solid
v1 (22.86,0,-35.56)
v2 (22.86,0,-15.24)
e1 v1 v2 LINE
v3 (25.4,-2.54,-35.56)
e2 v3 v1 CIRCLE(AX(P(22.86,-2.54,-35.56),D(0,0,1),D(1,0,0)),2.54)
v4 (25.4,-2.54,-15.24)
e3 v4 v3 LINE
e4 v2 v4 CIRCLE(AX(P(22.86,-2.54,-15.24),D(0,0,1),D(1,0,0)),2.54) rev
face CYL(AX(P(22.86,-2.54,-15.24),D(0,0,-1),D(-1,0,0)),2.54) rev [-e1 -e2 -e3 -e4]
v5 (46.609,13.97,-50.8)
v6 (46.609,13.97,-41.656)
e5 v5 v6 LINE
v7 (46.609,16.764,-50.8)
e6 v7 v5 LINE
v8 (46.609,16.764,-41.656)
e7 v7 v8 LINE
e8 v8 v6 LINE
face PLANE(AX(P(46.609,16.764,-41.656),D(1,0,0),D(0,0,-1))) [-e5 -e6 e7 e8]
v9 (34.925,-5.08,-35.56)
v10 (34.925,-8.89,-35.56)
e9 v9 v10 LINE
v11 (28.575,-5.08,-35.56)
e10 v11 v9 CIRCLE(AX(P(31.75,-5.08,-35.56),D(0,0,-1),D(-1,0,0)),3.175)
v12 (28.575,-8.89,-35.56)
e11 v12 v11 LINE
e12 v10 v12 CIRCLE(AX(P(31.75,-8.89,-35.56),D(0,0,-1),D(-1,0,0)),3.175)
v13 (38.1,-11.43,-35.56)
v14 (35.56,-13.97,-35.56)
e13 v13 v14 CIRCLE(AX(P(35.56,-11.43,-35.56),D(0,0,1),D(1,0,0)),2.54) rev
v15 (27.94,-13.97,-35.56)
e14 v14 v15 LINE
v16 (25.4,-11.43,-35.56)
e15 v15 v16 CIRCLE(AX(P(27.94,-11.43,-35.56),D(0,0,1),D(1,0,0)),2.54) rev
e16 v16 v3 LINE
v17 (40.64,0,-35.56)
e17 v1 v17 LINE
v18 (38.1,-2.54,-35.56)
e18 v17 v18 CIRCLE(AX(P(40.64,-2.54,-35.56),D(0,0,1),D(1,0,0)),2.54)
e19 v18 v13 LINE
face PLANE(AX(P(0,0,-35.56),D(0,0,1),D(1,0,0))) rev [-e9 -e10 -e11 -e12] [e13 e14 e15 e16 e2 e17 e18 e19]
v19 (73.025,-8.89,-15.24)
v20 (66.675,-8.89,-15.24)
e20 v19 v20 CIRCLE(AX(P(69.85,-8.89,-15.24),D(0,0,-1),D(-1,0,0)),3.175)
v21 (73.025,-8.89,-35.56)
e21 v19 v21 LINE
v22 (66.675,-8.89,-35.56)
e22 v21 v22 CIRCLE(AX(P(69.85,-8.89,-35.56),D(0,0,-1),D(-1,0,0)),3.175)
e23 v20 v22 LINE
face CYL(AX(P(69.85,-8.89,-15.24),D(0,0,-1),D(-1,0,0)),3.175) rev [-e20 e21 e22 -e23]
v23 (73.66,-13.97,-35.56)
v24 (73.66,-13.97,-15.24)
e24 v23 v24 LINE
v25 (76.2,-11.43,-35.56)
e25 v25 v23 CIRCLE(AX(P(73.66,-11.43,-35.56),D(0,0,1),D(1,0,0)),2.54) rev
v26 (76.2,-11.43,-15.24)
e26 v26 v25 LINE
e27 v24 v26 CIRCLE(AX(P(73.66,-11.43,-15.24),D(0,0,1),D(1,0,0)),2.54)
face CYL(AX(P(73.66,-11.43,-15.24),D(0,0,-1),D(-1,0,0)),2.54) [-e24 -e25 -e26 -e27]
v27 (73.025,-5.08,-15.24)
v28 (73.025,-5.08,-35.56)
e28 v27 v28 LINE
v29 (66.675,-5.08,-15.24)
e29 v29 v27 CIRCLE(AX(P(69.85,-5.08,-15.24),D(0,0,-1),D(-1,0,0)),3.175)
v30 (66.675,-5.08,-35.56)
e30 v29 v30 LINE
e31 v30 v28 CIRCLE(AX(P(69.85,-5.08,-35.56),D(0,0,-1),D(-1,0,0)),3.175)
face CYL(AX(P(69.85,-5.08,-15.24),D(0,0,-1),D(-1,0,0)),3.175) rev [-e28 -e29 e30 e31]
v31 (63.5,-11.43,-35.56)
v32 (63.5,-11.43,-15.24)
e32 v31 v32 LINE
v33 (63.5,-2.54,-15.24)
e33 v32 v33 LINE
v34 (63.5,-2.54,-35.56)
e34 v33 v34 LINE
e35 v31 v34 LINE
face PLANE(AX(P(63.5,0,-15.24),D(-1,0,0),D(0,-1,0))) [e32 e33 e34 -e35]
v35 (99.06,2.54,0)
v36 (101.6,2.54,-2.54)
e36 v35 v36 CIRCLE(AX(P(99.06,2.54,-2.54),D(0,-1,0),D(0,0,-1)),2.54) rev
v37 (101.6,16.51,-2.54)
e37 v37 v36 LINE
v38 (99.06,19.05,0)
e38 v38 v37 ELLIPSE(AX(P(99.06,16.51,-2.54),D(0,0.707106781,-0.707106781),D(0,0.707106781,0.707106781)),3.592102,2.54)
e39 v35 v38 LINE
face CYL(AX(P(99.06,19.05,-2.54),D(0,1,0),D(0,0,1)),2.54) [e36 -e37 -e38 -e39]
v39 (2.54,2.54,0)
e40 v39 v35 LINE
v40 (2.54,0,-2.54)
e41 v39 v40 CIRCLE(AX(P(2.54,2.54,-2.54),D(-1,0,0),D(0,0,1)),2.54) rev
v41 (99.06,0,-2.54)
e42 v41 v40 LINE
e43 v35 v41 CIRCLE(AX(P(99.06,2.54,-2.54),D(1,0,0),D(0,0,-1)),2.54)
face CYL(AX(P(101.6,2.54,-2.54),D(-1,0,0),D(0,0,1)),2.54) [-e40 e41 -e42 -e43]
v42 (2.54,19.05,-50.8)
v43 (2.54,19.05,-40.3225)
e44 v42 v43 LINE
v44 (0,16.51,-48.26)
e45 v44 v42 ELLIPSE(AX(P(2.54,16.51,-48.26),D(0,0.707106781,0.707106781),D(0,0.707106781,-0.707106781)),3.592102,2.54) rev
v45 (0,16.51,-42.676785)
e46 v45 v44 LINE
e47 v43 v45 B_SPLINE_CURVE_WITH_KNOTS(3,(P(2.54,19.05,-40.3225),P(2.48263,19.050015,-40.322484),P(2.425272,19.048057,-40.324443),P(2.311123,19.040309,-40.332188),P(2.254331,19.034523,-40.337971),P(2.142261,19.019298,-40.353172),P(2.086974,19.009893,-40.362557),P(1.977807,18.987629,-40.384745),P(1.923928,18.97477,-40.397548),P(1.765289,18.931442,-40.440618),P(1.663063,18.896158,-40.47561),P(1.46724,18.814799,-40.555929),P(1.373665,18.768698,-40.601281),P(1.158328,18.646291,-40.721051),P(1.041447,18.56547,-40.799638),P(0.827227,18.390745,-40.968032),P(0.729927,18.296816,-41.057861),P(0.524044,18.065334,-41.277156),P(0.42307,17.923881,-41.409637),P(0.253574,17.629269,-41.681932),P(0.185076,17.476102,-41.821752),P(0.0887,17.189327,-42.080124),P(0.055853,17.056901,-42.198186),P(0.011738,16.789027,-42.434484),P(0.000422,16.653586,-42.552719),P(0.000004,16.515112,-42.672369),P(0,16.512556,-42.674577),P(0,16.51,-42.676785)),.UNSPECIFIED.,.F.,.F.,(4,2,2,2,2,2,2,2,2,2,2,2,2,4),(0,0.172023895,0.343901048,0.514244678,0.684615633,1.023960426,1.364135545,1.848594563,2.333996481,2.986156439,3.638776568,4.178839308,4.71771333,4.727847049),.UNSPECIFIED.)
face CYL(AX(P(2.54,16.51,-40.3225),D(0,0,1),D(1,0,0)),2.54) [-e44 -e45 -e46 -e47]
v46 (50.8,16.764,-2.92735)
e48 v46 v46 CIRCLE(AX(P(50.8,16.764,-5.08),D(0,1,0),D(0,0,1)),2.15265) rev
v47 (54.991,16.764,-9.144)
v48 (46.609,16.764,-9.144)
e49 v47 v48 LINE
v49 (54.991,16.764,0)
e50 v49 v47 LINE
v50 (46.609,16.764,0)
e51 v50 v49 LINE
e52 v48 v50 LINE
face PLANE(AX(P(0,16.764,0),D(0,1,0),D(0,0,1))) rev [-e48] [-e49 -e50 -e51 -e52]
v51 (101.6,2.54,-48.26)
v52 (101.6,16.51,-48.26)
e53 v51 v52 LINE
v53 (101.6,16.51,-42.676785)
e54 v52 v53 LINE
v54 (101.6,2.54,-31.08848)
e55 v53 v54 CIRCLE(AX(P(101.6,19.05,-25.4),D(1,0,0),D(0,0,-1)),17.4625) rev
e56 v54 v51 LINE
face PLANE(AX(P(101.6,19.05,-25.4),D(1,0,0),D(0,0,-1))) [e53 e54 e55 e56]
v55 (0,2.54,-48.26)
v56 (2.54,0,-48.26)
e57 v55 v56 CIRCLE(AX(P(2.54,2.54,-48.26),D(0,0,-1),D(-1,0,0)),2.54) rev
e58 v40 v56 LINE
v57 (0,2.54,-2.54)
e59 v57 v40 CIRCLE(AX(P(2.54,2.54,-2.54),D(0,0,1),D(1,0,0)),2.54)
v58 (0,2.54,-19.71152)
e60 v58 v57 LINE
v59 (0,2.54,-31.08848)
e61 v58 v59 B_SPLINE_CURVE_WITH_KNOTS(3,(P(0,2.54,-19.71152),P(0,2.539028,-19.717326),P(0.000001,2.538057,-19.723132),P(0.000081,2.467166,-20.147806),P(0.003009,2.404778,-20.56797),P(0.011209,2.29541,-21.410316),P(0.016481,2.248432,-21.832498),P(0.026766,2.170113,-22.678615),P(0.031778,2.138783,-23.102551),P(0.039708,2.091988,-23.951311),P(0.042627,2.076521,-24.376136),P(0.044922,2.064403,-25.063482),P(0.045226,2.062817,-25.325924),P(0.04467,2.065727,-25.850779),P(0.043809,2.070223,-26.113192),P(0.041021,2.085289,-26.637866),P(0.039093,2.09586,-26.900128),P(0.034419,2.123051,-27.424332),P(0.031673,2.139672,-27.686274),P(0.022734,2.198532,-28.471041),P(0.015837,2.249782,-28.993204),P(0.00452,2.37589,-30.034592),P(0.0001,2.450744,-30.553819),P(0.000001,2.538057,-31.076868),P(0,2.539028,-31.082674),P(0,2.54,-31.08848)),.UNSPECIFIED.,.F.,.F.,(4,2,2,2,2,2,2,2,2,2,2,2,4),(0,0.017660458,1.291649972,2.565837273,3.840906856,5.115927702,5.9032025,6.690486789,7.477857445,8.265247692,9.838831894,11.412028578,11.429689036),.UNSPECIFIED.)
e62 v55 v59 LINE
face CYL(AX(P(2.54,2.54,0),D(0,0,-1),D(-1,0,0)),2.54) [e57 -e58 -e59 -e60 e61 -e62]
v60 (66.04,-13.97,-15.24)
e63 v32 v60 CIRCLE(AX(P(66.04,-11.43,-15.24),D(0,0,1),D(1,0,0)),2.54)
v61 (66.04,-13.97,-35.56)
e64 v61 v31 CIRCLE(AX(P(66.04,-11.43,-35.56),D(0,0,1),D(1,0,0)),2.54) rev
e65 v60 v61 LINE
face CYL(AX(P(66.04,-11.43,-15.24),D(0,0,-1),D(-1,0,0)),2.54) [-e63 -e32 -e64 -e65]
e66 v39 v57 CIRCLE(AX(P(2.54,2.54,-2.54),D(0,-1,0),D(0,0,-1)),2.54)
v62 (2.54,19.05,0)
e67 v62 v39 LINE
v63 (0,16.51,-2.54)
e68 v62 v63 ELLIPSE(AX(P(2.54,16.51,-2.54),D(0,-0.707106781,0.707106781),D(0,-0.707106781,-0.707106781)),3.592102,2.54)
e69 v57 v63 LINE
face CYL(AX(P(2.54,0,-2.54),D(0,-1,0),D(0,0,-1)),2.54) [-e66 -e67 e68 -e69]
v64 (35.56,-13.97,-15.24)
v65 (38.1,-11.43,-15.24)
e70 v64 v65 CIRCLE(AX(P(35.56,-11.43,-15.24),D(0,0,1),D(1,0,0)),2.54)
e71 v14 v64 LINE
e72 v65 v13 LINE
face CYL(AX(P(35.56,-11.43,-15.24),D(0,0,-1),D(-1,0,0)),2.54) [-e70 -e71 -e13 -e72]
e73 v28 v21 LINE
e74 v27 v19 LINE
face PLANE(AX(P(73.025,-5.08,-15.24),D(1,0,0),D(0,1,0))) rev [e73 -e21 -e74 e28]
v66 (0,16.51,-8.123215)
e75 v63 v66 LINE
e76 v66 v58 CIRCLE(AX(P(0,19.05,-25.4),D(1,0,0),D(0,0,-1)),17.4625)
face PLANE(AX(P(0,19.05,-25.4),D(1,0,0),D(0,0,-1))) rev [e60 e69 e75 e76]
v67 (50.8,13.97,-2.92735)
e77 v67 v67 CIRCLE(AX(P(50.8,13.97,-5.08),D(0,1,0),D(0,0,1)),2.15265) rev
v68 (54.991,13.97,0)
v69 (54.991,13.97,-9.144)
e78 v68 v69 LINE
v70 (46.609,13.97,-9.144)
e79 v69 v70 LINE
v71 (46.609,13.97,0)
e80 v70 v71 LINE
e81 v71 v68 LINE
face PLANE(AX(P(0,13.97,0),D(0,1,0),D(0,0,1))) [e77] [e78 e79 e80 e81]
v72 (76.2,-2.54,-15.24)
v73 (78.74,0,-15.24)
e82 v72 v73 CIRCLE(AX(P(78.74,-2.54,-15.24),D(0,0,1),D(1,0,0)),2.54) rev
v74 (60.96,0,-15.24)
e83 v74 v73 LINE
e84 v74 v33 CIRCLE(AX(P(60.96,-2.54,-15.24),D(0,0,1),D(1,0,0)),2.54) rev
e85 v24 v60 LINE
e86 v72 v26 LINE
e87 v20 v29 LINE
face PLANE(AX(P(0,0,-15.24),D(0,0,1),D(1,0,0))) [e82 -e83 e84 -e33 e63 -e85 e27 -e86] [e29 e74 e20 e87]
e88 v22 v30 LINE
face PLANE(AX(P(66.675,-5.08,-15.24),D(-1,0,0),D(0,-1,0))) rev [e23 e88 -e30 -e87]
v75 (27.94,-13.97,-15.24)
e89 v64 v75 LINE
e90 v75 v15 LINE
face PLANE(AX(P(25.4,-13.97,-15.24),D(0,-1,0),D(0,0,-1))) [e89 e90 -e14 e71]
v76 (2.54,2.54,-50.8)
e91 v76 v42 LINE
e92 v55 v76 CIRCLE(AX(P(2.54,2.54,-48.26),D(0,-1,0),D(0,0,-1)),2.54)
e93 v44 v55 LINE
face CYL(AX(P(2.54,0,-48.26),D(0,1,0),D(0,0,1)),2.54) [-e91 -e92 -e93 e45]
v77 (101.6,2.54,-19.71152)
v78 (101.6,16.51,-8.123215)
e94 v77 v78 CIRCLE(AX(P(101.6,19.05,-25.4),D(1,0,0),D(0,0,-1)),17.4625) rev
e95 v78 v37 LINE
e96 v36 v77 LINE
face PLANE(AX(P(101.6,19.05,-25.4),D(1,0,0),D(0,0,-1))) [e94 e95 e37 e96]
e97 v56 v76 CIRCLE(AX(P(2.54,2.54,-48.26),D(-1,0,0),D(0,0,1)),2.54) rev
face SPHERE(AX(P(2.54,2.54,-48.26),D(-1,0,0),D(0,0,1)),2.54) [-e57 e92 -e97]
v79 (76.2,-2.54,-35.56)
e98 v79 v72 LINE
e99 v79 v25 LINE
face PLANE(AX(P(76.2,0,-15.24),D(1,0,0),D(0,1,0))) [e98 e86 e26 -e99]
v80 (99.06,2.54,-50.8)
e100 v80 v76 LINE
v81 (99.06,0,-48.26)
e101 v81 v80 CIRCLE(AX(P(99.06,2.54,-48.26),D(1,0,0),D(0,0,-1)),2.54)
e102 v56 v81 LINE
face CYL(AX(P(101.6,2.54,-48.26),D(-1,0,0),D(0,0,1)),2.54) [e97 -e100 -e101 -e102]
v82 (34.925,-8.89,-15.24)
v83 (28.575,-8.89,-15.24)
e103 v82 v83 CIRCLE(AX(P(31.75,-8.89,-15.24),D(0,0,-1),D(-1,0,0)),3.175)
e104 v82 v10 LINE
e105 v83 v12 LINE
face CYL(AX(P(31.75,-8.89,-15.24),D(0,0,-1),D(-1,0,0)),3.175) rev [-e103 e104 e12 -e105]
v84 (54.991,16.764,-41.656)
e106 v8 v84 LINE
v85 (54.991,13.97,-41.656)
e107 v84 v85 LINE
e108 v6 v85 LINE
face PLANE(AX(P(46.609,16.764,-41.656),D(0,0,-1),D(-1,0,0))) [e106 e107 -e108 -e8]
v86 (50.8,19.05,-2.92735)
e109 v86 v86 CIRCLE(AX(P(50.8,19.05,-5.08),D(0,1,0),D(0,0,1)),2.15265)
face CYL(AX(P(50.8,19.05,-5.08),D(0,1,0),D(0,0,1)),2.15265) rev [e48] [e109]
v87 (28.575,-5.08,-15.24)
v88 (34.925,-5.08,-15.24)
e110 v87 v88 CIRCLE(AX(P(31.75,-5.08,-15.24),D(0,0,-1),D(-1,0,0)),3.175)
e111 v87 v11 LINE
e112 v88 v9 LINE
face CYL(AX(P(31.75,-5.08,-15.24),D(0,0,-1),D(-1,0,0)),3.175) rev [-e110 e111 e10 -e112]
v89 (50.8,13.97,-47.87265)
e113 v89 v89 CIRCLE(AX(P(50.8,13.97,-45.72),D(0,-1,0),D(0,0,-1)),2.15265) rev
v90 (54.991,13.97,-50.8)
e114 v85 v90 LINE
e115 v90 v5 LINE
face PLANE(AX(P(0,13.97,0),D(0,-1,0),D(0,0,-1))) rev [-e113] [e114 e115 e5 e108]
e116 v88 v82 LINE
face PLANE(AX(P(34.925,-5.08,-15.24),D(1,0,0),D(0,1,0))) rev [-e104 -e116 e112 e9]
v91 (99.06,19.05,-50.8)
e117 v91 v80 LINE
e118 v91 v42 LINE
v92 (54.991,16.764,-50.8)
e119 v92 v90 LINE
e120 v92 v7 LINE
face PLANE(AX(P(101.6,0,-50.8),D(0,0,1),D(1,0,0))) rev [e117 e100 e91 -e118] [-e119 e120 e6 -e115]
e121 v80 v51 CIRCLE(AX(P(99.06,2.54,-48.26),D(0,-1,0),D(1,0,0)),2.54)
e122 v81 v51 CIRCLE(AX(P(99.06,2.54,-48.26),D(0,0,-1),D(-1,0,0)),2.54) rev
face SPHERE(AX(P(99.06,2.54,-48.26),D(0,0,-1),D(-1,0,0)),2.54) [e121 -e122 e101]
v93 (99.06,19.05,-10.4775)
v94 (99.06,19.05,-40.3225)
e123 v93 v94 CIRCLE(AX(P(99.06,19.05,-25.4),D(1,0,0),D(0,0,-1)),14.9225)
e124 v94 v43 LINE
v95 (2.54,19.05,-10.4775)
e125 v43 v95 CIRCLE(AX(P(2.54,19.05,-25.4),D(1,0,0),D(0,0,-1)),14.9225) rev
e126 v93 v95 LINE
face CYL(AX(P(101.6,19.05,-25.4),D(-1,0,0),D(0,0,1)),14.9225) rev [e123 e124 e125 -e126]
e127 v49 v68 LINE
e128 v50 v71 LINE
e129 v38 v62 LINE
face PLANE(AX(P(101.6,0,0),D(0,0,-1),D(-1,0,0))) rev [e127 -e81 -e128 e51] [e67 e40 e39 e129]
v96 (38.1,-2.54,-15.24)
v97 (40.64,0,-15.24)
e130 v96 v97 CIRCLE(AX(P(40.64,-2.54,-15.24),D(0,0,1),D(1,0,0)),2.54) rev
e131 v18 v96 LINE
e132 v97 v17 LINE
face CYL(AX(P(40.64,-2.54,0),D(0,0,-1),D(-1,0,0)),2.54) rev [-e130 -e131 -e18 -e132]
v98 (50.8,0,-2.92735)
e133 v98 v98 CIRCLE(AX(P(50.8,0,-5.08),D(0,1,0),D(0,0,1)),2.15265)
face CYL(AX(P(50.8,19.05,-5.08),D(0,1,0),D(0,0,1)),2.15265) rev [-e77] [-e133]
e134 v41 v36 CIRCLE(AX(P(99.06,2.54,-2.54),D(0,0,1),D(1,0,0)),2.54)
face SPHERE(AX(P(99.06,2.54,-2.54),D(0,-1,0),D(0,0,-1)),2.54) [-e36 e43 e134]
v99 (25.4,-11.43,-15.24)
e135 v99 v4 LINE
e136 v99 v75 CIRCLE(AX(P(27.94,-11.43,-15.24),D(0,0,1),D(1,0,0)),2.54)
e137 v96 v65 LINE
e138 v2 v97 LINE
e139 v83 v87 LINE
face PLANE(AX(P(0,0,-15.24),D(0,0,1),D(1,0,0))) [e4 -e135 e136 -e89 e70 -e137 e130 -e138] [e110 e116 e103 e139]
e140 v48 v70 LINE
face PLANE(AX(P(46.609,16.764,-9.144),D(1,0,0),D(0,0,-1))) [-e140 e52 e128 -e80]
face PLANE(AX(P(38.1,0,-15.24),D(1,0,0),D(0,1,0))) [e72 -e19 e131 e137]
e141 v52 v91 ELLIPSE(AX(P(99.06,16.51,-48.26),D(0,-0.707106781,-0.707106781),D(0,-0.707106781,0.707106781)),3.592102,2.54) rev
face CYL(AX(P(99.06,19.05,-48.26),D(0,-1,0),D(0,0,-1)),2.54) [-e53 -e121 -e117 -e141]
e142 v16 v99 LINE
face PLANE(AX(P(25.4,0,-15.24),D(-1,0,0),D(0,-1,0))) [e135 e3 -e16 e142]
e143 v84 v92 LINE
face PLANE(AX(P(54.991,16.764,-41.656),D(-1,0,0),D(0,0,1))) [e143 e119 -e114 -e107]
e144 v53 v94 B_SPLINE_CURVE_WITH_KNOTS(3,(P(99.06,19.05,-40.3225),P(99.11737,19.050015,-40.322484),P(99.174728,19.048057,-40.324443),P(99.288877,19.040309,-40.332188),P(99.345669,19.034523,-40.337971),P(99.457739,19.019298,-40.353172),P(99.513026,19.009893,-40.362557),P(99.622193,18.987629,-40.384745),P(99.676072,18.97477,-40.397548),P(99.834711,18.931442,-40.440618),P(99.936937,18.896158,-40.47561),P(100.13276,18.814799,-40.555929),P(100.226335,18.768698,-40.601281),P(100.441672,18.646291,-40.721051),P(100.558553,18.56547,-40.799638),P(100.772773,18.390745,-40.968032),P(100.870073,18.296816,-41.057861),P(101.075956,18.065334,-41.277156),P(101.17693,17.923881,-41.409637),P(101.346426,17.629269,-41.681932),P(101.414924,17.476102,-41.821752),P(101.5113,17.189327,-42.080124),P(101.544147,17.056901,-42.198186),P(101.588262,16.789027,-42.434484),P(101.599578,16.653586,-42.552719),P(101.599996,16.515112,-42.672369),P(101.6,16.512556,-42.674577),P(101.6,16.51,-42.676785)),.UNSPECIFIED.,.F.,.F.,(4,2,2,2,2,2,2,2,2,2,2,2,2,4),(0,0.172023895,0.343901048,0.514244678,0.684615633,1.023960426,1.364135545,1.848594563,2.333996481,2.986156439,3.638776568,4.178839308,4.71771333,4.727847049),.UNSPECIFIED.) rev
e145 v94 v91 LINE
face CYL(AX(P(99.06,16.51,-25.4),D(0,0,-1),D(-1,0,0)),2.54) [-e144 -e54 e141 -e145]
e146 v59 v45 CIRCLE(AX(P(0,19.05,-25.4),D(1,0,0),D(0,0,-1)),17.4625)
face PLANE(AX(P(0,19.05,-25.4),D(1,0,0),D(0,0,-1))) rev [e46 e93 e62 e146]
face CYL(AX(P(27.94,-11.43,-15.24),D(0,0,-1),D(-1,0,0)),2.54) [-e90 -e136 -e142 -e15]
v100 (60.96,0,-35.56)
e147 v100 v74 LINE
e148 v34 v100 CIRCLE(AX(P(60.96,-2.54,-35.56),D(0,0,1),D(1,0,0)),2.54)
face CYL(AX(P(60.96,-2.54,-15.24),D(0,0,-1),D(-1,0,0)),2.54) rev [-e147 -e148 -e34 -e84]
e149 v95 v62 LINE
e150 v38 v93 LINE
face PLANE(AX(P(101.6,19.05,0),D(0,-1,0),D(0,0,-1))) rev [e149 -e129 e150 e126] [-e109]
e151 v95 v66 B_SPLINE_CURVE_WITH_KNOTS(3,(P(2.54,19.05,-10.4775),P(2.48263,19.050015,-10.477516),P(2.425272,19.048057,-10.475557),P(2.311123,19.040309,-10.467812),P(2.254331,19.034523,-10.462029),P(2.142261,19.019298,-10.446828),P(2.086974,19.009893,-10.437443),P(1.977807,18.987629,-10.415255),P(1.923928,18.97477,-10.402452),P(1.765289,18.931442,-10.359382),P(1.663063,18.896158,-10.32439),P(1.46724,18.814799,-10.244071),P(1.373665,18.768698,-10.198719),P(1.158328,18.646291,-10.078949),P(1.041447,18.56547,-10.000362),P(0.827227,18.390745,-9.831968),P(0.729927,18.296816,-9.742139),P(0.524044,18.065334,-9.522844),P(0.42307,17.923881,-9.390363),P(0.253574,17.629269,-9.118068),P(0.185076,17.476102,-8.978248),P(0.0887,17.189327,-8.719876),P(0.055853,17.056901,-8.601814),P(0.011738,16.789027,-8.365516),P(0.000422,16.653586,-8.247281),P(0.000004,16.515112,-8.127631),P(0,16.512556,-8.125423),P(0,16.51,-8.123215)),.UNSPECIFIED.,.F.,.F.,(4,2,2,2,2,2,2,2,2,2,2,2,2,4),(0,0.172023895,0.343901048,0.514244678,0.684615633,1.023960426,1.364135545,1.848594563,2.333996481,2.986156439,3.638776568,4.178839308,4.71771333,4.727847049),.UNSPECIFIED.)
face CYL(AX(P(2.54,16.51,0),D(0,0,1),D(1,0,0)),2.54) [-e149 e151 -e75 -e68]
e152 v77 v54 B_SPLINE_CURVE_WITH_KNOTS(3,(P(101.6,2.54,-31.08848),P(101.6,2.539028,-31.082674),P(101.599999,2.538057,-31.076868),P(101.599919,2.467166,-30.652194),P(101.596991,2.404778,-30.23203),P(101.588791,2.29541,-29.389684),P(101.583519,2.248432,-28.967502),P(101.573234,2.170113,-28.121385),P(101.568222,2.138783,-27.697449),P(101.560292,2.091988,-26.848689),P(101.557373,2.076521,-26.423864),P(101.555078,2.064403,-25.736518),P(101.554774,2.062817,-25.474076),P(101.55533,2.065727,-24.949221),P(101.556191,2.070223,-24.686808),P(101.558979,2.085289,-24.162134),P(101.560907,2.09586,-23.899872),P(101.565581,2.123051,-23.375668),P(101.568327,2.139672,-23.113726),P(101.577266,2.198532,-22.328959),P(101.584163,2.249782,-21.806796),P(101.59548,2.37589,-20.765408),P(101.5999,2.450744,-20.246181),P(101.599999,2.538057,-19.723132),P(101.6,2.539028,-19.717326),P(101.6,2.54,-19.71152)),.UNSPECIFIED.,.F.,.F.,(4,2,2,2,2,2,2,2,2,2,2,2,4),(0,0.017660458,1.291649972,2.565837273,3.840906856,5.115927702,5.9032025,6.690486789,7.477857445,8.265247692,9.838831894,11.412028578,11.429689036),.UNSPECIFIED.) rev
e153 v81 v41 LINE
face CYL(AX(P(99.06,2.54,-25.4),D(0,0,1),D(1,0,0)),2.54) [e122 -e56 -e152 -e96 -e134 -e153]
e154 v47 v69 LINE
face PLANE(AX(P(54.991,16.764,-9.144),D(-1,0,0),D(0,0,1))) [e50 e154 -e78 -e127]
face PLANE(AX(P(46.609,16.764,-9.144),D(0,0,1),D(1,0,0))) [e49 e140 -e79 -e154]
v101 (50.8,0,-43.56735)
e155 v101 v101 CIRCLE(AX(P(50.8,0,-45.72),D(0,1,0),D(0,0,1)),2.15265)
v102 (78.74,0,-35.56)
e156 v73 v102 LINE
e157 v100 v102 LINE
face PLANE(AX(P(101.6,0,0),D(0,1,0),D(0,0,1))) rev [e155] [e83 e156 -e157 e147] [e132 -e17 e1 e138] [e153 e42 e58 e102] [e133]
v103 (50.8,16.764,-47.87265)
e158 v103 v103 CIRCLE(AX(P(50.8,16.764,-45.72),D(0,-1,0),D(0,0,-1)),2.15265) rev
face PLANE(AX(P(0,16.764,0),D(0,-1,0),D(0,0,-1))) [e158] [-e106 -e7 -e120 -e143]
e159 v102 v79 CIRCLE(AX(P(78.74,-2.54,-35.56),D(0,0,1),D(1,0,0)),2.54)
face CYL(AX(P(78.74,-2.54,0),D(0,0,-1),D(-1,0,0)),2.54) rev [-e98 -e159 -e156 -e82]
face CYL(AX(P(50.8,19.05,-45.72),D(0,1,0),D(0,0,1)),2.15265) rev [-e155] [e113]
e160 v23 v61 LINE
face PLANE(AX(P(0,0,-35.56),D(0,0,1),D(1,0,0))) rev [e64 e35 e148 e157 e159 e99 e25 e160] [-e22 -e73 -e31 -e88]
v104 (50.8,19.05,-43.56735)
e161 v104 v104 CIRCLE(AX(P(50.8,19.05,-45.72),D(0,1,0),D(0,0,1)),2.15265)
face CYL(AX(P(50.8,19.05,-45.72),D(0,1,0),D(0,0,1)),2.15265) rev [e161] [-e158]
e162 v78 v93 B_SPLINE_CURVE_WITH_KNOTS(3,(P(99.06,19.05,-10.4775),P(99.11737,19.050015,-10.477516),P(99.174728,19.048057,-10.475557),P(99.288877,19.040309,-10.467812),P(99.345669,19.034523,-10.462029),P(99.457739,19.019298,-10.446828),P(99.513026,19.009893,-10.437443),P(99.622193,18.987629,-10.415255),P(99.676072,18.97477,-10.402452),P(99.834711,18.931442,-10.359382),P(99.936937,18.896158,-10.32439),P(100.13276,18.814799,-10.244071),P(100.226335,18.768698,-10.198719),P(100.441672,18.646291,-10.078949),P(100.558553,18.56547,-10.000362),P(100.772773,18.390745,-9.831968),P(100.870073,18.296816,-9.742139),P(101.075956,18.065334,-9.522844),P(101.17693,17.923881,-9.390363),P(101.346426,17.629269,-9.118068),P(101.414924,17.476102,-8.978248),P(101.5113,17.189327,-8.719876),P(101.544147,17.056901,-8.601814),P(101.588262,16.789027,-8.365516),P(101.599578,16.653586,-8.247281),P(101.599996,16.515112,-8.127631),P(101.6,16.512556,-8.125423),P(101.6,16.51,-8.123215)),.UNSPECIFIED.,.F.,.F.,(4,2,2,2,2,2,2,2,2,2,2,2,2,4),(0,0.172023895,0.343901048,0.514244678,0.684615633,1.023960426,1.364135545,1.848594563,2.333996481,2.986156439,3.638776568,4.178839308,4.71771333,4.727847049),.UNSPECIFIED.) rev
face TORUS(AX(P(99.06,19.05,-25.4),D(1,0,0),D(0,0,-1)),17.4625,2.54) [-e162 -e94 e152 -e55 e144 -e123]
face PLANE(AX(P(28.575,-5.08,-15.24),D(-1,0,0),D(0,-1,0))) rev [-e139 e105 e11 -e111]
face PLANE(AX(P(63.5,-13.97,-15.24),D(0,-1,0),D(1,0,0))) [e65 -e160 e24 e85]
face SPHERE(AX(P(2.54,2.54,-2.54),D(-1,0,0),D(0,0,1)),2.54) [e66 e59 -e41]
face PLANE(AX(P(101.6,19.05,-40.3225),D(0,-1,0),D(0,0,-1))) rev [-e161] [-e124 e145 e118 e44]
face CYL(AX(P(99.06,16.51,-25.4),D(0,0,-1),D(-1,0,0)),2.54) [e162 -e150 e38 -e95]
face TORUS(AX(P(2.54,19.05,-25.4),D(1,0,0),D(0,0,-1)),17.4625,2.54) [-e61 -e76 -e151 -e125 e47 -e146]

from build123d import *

# Parameters (mm, degrees)
BOSS_EXTRUDE2_DEPTH   = 101.6
SKETCH14_W            = 12.7
SKETCH14_H            = 13.97
BOSS_EXTRUDE3_DEPTH   = 20.32
F_6_CLEARANCE_HOLE1_D = 4.3053
SKETCH8_W             = 8.382
SKETCH8_H             = 9.144
CUT_EXTRUDE2_DEPTH    = 2.794
FILLET1_R             = 2.54


with BuildPart() as part:
    # Sketch3 → Boss-Extrude2 (new body)
    with BuildSketch(Plane(origin=(0, 0, 0), x_dir=(0, 0, -1), z_dir=(1, 0, 0))):
        with BuildLine():
            Line((40.3225, 19.05), (50.8, 19.05))
            Line((50.8, 19.05), (50.8, 0))
            Line((50.8, 0), (0, 0))
            Line((0, 0), (0, 19.05))
            Line((0, 19.05), (10.4775, 19.05))
            ThreePointArc((10.4775, 19.05), (25.4, 4.1275), (40.3225, 19.05))
        make_face()
    extrude(amount=BOSS_EXTRUDE2_DEPTH)

    # Sketch14 → Boss-Extrude3 (add)
    # profile 1 of 2: a face of its own
    with BuildSketch(Plane(origin=(0, 0, -35.56), x_dir=(-1, 0, 0), z_dir=(0, 0, -1))):
        with Locations((-69.85, -6.985)):
            Rectangle(SKETCH14_W, SKETCH14_H)
        with BuildLine():
            Line((-66.675, -5.08), (-66.675, -8.89))
            ThreePointArc((-66.675, -8.89), (-69.85, -12.065), (-73.025, -8.89))
            Line((-73.025, -8.89), (-73.025, -5.08))
            ThreePointArc((-73.025, -5.08), (-69.85, -1.905), (-66.675, -5.08))
        make_face(mode=Mode.SUBTRACT)
    # profile 2 of 2: a face of its own
    with BuildSketch(Plane(origin=(0, 0, -35.56), x_dir=(-1, 0, 0), z_dir=(0, 0, -1))):
        with Locations((-31.75, -6.985)):
            Rectangle(SKETCH14_W, SKETCH14_H)
        with BuildLine():
            Line((-28.575, -5.08), (-28.575, -8.89))
            ThreePointArc((-28.575, -8.89), (-31.75, -12.065), (-34.925, -8.89))
            Line((-34.925, -8.89), (-34.925, -5.08))
            ThreePointArc((-34.925, -5.08), (-31.75, -1.905), (-28.575, -5.08))
        make_face(mode=Mode.SUBTRACT)
    extrude(amount=-BOSS_EXTRUDE3_DEPTH)

    # #6 Clearance Hole1 (through all)
    with Locations(Plane(origin=(0, 19.05, 0), x_dir=(1, 0, 0), z_dir=(0, 1, 0))):
        with Locations((50.8, 5.08), (50.8, 45.72)):
            Hole(F_6_CLEARANCE_HOLE1_D / 2)

    # Sketch8 → Cut-Extrude2 (cut)
    with BuildSketch(Plane(origin=(0, 13.97, 0), x_dir=(1, 0, 0), z_dir=(0, 1, 0))):
        with Locations((50.8, 4.572)):
            Rectangle(SKETCH8_W, SKETCH8_H)
        with Locations((50.8, 46.228)):
            Rectangle(SKETCH8_W, SKETCH8_H)
    extrude(amount=CUT_EXTRUDE2_DEPTH, mode=Mode.SUBTRACT)

    # Fillet1
    # the kernel refuses this fillet: 2.54 mm, written as the material it adds along each edge
    with BuildSketch(Plane(origin=(63.5, 0, -35.56), x_dir=(-1, 0, 0), z_dir=(0, 0, 1)), Plane(origin=(25.4, 0, -35.56), x_dir=(-1, 0, 0), z_dir=(0, 0, 1))) as fillet1_piece_1:
        with BuildLine():
            CenterArc((FILLET1_R, FILLET1_R), FILLET1_R, 180, 90)
            Line((0, FILLET1_R), (0, 0))
            Line((0, 0), (FILLET1_R, 0))
        make_face()
    extrude(amount=20.32)
    with BuildSketch(Plane(origin=(76.2, 0, -35.56), x_dir=(1, 0, 0), z_dir=(0, 0, 1)), Plane(origin=(38.1, 0, -35.56), x_dir=(1, 0, 0), z_dir=(0, 0, 1))) as fillet1_piece_2:
        with BuildLine():
            CenterArc((FILLET1_R, -FILLET1_R), FILLET1_R, 90, 90)
            Line((0, -FILLET1_R), (0, 0))
            Line((0, 0), (FILLET1_R, 0))
        make_face()
    extrude(amount=20.32)
    # the kernel refuses this fillet: 2.54 mm, written as the material it takes off along each edge
    with BuildSketch(Plane(origin=(2.54, 2.54, -48.26), x_dir=(-1, 0, 0), z_dir=(0, 0, -1))) as fillet1_2_piece_1_section:
        Polygon((0, 0), (FILLET1_R, 0), (FILLET1_R, -FILLET1_R), (0, -FILLET1_R), align=None)
    fillet1_2_piece_1 = extrude(amount=FILLET1_R, mode=Mode.PRIVATE)
    fillet1_2_piece_1 = fillet1_2_piece_1 - Plane(origin=(2.54, 2.54, -48.26), x_dir=(0.7071067811865475, 0.7071067811865475, 0), z_dir=(0, 0, -1)) * Sphere(FILLET1_R, mode=Mode.PRIVATE)
    add(fillet1_2_piece_1, mode=Mode.SUBTRACT)
    with BuildSketch(Plane(origin=(99.06, 2.54, -48.26), x_dir=(1, 0, 0), z_dir=(0, 0, -1))) as fillet1_2_piece_2_section:
        Polygon((0, 0), (FILLET1_R, 0), (FILLET1_R, FILLET1_R), (0, FILLET1_R), align=None)
    fillet1_2_piece_2 = extrude(amount=FILLET1_R, mode=Mode.PRIVATE)
    fillet1_2_piece_2 = fillet1_2_piece_2 - Plane(origin=(99.06, 2.54, -48.26), x_dir=(-0.7071067811865475, 0.7071067811865475, 0), z_dir=(0, 0, -1)) * Sphere(FILLET1_R, mode=Mode.PRIVATE)
    add(fillet1_2_piece_2, mode=Mode.SUBTRACT)
    with BuildSketch(Plane(origin=(2.54, 2.54, -2.54), x_dir=(0, 0, 1), z_dir=(-1, 0, 0))) as fillet1_2_piece_3_section:
        Polygon((0, 0), (FILLET1_R, 0), (FILLET1_R, -FILLET1_R), (0, -FILLET1_R), align=None)
    fillet1_2_piece_3 = extrude(amount=FILLET1_R, mode=Mode.PRIVATE)
    fillet1_2_piece_3 = fillet1_2_piece_3 - Plane(origin=(2.54, 2.54, -2.54), x_dir=(0, 0.7071067811865475, -0.7071067811865475), z_dir=(-1, 0, 0)) * Sphere(FILLET1_R, mode=Mode.PRIVATE)
    add(fillet1_2_piece_3, mode=Mode.SUBTRACT)
    with BuildSketch(Plane(origin=(99.06, 2.54, -2.54), x_dir=(0, 0, 1), z_dir=(1, 0, 0))) as fillet1_2_piece_4_section:
        Polygon((0, 0), (FILLET1_R, 0), (FILLET1_R, FILLET1_R), (0, FILLET1_R), align=None)
    fillet1_2_piece_4 = extrude(amount=FILLET1_R, mode=Mode.PRIVATE)
    fillet1_2_piece_4 = fillet1_2_piece_4 - Plane(origin=(99.06, 2.54, -2.54), x_dir=(0, 0.7071067811865475, -0.7071067811865475), z_dir=(1, 0, 0)) * Sphere(FILLET1_R, mode=Mode.PRIVATE)
    add(fillet1_2_piece_4, mode=Mode.SUBTRACT)
    with BuildSketch(Plane(origin=(2.54, 0, -50.8), x_dir=(0, 0, 1), z_dir=(1, 0, 0))) as fillet1_2_piece_5:
        with BuildLine():
            CenterArc((FILLET1_R, -FILLET1_R), FILLET1_R, 90, 90)
            Line((0, -FILLET1_R), (0, 0))
            Line((0, 0), (FILLET1_R, 0))
        make_face()
    extrude(amount=96.52, mode=Mode.SUBTRACT)
    with BuildSketch(Plane(origin=(2.54, 0, 0), x_dir=(0, 0, -1), z_dir=(1, 0, 0))) as fillet1_2_piece_6:
        with BuildLine():
            CenterArc((FILLET1_R, FILLET1_R), FILLET1_R, 180, 90)
            Line((0, FILLET1_R), (0, 0))
            Line((0, 0), (FILLET1_R, 0))
        make_face()
    extrude(amount=96.52, mode=Mode.SUBTRACT)
    with BuildSketch(Plane(origin=(101.6, 25.4, -50.8), x_dir=(-1, 0, 0), z_dir=(0, -1, 0)), Plane(origin=(101.6, 2.54, 0), x_dir=(-1, 0, 0), z_dir=(0, 1, 0))) as fillet1_2_piece_7:
        with BuildLine():
            CenterArc((FILLET1_R, -FILLET1_R), FILLET1_R, 90, 90)
            Line((0, -FILLET1_R), (0, 0))
            Line((0, 0), (FILLET1_R, 0))
        make_face()
    extrude(amount=22.86, mode=Mode.SUBTRACT)
    with BuildSketch(Plane(origin=(101.6, 19.05, -33.9725), x_dir=(-1, 0, 0), z_dir=(0, 0, -1)), Plane(origin=(101.6, 19.05, 6.35), x_dir=(-1, 0, 0), z_dir=(0, 0, -1))) as fillet1_2_piece_8:
        with BuildLine():
            CenterArc((FILLET1_R, -FILLET1_R), FILLET1_R, 90, 90)
            Line((0, -FILLET1_R), (0, 0))
            Line((0, 0), (FILLET1_R, 0))
        make_face()
    extrude(amount=23.1775, mode=Mode.SUBTRACT)
    with BuildSketch(Plane(origin=(101.6, 19.05, -25.4), x_dir=(0, 0.4134285279773088, 0.9105365738148663), z_dir=(0, 0.9105365738148663, -0.4134285279773088))) as fillet1_2_piece_9:
        with BuildLine():
            CenterArc((14.9225 + FILLET1_R, -FILLET1_R), FILLET1_R, 90, 90)
            Line((14.9225, -FILLET1_R), (14.9225, 0))
            Line((14.9225, 0), (14.9225 + FILLET1_R, 0))
        make_face()
    revolve(axis=Axis((101.6, 19.05, -25.4), (1, 0, 0)), revolution_arc=228.840784647, mode=Mode.SUBTRACT)
    with BuildSketch(Plane(origin=(63.5, -13.97, -41.91), x_dir=(1, 0, 0), z_dir=(0, 0, 1)), Plane(origin=(76.2, -13.97, -41.91), x_dir=(0, 1, 0), z_dir=(0, 0, 1)), Plane(origin=(25.4, -13.97, -41.91), x_dir=(1, 0, 0), z_dir=(0, 0, 1)), Plane(origin=(38.1, -13.97, -41.91), x_dir=(0, 1, 0), z_dir=(0, 0, 1))) as fillet1_2_piece_10:
        with BuildLine():
            CenterArc((FILLET1_R, FILLET1_R), FILLET1_R, 180, 90)
            Line((0, FILLET1_R), (0, 0))
            Line((0, 0), (FILLET1_R, 0))
        make_face()
    extrude(amount=33.02, mode=Mode.SUBTRACT)
    with BuildSketch(Plane(origin=(0, 19.05, 6.35), x_dir=(1, 0, 0), z_dir=(0, 0, -1)), Plane(origin=(0, 19.05, -33.9725), x_dir=(1, 0, 0), z_dir=(0, 0, -1))) as fillet1_2_piece_11:
        with BuildLine():
            CenterArc((FILLET1_R, FILLET1_R), FILLET1_R, 180, 90)
            Line((0, FILLET1_R), (0, 0))
            Line((0, 0), (FILLET1_R, 0))
        make_face()
    extrude(amount=23.1775, mode=Mode.SUBTRACT)
    with BuildSketch(Plane(origin=(0, 19.05, -25.4), x_dir=(0, 0.4134285279773076, 0.9105365738148669), z_dir=(0, 0.9105365738148669, -0.4134285279773076))) as fillet1_2_piece_12:
        with BuildLine():
            CenterArc((14.9225 + FILLET1_R, FILLET1_R), FILLET1_R, 180, 90)
            Line((14.9225, FILLET1_R), (14.9225, 0))
            Line((14.9225, 0), (14.9225 + FILLET1_R, 0))
        make_face()
    revolve(axis=Axis((0, 19.05, -25.4), (1, 0, 0)), revolution_arc=228.840784647, mode=Mode.SUBTRACT)
    with BuildSketch(Plane(origin=(0, 25.4, -50.8), x_dir=(1, 0, 0), z_dir=(0, -1, 0)), Plane(origin=(0, 2.54, 0), x_dir=(1, 0, 0), z_dir=(0, 1, 0))) as fillet1_2_piece_13:
        with BuildLine():
            CenterArc((FILLET1_R, FILLET1_R), FILLET1_R, 180, 90)
            Line((0, FILLET1_R), (0, 0))
            Line((0, 0), (FILLET1_R, 0))
        make_face()
    extrude(amount=22.86, mode=Mode.SUBTRACT)
    with BuildSketch(Plane(origin=(0, 0, -48.26), x_dir=(1, 0, 0), z_dir=(0, 0, 1))) as fillet1_2_piece_14:
        with BuildLine():
            CenterArc((FILLET1_R, FILLET1_R), FILLET1_R, 180, 90)
            Line((0, FILLET1_R), (0, 0))
            Line((0, 0), (FILLET1_R, 0))
        make_face()
    extrude(amount=45.72, mode=Mode.SUBTRACT)
    with BuildSketch(Plane(origin=(101.6, 0, -48.26), x_dir=(-1, 0, 0), z_dir=(0, 0, 1))) as fillet1_2_piece_15:
        with BuildLine():
            CenterArc((FILLET1_R, -FILLET1_R), FILLET1_R, 90, 90)
            Line((0, -FILLET1_R), (0, 0))
            Line((0, 0), (FILLET1_R, 0))
        make_face()
    extrude(amount=45.72, mode=Mode.SUBTRACT)


solid = part.part
